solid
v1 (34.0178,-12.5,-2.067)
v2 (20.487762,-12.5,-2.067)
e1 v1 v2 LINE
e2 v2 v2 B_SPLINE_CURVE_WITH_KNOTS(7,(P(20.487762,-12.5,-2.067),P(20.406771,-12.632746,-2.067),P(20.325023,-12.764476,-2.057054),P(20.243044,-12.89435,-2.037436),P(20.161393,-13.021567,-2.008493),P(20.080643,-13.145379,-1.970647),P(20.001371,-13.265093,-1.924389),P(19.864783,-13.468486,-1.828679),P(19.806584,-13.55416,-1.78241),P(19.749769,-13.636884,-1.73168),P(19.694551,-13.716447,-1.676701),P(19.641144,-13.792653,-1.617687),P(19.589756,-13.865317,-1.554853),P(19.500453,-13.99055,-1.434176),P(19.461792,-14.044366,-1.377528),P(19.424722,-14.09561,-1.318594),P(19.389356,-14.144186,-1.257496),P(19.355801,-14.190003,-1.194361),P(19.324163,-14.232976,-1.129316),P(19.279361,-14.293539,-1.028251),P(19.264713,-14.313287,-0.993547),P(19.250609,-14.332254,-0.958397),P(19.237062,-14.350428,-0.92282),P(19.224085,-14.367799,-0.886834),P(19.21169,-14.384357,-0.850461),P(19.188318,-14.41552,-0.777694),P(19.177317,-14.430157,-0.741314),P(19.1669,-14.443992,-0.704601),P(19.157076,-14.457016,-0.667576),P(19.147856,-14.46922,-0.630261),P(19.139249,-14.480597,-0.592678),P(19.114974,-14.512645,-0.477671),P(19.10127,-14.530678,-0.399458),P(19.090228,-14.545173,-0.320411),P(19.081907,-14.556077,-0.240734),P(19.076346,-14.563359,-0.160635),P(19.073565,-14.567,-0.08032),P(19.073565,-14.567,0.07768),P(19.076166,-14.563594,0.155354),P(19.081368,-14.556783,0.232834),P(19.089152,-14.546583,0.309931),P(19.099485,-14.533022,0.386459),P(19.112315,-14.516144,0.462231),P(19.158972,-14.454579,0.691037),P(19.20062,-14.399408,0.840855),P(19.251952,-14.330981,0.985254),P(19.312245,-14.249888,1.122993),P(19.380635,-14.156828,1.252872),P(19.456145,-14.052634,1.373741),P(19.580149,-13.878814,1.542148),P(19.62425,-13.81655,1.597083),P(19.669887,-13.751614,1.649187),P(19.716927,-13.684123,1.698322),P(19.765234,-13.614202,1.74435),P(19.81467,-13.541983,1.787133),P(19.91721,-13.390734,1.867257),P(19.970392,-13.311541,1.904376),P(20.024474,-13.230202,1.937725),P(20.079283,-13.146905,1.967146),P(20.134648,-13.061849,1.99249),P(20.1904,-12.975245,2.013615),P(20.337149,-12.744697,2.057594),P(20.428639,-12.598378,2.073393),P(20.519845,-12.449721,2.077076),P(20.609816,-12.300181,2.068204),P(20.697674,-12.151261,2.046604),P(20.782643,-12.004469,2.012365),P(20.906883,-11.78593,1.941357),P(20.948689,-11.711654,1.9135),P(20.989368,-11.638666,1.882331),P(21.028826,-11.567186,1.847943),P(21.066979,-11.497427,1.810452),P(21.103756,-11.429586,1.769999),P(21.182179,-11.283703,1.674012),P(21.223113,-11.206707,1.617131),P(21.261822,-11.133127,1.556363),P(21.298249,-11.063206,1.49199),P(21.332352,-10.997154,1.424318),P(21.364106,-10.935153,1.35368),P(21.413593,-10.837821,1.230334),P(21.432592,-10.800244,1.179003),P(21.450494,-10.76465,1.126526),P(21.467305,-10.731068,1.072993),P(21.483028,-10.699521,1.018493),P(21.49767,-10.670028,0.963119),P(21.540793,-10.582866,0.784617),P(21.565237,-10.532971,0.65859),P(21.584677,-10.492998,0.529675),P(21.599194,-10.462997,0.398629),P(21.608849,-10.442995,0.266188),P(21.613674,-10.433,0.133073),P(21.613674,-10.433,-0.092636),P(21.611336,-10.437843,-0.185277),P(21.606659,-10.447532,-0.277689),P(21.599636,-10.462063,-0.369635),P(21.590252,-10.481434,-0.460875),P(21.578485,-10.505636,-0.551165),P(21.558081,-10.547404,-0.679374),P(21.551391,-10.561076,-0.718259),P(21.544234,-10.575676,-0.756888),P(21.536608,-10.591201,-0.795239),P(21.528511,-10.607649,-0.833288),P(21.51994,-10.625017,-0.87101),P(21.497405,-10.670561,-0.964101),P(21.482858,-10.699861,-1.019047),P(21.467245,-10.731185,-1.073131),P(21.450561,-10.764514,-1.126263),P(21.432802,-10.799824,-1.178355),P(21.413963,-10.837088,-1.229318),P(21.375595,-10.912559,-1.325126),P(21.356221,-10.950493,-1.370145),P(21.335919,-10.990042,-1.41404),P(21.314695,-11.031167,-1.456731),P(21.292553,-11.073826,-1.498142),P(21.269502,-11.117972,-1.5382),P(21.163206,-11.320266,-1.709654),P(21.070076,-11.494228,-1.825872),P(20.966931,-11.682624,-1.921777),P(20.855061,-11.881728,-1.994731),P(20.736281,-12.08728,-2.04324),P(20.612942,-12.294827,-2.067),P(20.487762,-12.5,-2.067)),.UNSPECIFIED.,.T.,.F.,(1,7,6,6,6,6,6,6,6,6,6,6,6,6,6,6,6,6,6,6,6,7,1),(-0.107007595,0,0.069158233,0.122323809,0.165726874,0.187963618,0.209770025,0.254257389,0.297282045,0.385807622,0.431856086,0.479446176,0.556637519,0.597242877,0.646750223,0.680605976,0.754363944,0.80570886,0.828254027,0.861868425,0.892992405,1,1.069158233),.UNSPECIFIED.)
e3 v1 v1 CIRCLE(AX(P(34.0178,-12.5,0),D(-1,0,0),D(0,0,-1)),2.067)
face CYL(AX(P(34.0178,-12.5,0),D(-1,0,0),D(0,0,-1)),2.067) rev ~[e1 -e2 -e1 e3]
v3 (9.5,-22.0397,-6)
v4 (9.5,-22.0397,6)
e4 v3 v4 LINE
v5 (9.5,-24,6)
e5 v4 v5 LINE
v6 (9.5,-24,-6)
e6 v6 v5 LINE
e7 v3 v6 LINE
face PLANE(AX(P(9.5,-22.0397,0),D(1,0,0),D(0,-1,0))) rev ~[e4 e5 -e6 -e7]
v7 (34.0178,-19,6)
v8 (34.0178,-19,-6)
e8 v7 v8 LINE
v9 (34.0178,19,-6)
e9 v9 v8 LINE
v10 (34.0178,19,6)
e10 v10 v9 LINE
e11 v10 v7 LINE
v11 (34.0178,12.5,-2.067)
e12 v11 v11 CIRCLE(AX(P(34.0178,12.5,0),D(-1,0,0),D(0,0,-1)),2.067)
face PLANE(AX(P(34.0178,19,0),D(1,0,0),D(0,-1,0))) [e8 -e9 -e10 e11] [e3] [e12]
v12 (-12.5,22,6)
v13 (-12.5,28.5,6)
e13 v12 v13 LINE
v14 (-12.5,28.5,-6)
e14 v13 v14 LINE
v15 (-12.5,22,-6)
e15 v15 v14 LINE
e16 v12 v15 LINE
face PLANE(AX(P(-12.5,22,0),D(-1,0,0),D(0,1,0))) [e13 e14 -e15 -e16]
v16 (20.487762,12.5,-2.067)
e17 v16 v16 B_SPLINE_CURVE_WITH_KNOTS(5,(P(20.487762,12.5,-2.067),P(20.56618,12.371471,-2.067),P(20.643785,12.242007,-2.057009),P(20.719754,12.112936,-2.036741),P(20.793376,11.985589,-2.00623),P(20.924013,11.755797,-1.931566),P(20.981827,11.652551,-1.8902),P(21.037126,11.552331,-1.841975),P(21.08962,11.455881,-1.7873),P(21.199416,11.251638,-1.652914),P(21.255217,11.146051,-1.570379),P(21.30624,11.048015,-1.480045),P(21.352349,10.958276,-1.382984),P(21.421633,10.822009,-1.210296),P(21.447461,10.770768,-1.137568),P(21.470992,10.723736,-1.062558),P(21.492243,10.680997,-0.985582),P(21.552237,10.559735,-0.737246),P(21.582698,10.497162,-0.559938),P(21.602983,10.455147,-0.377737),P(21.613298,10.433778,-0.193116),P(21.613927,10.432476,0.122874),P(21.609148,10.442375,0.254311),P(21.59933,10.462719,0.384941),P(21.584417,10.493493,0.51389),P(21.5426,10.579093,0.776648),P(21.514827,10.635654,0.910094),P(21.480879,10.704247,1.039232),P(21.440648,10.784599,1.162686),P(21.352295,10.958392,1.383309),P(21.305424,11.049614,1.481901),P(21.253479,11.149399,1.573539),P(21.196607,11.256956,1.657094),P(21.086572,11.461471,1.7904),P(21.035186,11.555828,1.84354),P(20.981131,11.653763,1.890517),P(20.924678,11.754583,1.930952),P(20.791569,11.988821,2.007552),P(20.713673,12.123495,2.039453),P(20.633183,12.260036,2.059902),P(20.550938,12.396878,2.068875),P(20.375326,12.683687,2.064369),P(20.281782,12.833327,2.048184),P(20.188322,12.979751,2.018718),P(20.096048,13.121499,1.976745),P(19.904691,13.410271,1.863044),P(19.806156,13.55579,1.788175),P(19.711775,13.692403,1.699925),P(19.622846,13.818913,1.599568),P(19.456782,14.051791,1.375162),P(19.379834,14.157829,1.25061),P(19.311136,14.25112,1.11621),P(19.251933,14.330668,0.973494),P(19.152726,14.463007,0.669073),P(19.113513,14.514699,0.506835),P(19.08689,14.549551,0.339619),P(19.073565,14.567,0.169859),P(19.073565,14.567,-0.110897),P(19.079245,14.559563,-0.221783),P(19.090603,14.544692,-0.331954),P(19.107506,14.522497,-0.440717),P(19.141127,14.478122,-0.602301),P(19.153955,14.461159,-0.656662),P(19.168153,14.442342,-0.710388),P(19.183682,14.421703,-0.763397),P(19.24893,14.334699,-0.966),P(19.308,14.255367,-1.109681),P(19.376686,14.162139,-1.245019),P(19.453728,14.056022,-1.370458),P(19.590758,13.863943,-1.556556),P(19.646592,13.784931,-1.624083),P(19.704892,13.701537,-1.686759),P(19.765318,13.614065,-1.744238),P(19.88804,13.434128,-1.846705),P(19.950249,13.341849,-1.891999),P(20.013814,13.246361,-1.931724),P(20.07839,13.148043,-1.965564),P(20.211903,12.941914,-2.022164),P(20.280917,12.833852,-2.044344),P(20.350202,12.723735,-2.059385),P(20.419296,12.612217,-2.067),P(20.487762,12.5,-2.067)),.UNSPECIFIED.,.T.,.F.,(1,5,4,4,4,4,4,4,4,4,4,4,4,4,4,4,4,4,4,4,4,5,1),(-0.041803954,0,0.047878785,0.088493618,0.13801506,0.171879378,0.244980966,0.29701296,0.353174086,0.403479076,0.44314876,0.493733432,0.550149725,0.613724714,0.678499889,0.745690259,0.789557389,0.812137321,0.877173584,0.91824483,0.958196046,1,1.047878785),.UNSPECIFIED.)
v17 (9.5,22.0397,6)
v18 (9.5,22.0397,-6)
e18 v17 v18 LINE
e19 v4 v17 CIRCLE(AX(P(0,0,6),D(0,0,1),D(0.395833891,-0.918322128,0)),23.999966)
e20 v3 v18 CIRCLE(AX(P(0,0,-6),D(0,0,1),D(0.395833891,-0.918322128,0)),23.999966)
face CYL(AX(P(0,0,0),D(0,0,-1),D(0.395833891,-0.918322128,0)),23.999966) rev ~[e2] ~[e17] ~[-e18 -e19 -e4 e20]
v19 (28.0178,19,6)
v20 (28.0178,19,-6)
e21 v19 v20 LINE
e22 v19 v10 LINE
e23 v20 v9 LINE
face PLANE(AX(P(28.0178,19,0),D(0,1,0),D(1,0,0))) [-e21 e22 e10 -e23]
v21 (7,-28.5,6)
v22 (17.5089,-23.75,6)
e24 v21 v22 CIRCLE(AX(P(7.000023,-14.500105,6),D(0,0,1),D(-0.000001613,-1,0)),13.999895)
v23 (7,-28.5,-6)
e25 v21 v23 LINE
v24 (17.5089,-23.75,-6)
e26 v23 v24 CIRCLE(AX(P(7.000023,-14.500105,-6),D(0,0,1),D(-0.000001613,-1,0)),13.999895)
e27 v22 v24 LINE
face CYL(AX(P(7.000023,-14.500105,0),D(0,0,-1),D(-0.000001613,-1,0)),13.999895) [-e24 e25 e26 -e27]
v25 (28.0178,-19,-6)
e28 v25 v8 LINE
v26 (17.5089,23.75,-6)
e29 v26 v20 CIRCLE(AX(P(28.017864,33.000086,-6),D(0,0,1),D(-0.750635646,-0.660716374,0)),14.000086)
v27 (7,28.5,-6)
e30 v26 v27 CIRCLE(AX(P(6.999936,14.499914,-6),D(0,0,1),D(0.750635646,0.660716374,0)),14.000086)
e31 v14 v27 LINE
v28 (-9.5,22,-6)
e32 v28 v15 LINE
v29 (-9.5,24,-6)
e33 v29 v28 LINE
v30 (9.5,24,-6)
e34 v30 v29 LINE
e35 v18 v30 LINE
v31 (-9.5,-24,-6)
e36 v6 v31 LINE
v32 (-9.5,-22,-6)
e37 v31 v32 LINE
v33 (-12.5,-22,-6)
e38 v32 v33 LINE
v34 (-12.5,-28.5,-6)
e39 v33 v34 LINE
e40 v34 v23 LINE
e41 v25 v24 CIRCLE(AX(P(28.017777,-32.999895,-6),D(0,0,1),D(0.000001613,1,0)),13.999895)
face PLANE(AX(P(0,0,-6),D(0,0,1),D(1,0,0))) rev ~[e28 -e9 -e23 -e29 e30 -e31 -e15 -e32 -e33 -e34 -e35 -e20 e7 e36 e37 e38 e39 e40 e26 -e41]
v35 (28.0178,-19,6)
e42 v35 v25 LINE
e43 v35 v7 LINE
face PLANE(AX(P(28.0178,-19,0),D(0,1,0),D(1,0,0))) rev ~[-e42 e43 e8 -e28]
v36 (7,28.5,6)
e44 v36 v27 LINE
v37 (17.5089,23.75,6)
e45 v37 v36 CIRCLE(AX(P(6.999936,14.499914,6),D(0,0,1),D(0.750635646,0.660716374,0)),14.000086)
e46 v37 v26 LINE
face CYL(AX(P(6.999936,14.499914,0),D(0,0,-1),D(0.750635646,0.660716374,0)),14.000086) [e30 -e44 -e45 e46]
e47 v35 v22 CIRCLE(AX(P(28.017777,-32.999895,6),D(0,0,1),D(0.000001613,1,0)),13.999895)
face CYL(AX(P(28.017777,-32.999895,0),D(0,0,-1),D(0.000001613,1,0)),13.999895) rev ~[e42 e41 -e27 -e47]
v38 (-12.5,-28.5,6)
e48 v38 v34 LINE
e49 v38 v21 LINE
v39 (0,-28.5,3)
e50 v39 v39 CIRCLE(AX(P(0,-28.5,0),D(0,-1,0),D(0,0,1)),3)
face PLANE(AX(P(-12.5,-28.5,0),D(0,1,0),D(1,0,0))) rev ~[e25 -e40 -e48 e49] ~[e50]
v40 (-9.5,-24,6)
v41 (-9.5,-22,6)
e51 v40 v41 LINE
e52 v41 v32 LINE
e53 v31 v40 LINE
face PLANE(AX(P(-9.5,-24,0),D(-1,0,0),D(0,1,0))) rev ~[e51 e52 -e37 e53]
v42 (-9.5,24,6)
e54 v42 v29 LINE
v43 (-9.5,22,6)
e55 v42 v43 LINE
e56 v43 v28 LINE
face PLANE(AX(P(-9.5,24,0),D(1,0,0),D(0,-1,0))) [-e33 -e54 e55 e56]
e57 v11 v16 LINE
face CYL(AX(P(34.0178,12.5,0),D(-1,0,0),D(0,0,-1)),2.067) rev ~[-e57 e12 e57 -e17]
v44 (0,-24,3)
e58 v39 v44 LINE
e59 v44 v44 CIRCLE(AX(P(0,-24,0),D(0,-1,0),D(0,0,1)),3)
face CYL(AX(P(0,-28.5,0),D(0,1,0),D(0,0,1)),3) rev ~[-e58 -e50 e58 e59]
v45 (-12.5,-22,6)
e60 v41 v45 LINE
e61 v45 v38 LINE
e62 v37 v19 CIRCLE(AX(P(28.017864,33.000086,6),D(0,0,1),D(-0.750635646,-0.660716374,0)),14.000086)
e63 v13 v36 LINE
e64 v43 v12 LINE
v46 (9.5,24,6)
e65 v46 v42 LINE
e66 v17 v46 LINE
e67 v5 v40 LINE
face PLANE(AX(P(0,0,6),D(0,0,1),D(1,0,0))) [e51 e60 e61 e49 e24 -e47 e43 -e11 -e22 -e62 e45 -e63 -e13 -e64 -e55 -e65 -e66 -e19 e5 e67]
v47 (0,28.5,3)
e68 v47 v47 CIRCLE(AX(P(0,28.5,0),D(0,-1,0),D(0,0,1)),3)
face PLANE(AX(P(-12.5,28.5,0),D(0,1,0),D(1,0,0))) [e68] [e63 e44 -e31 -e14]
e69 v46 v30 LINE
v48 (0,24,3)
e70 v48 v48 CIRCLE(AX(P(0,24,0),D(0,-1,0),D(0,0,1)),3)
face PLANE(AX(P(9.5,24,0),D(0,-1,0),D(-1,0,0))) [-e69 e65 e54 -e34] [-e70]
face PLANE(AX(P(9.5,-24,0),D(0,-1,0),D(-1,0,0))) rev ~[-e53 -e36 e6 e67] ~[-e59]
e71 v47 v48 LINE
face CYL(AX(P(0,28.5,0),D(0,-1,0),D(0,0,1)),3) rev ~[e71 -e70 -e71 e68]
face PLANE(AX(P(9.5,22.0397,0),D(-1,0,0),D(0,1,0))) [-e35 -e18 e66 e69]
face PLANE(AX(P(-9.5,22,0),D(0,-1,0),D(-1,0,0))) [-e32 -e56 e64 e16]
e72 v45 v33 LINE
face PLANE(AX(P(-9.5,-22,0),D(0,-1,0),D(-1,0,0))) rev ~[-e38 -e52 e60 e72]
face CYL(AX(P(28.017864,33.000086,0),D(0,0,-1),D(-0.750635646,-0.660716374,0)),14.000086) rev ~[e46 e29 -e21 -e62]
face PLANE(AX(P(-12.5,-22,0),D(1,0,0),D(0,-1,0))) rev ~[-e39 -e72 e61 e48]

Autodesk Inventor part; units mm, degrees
ref_plane "YZ Plane" through (0, 0, 0) normal (1, 0, 0) x (0, 1, 0)
ref_plane "XZ Plane" through (0, 0, 0) normal (0, 1, 0) x (-1, 0, 0)
ref_plane "XY Plane" through (0, 0, 0) normal (0, 0, 1) x (1, 0, 0)
sketch "Sketch1" plane through (0, 0, 0) normal (0, 0, 1) x (1, 0, 0)
  arc A0 (9.5, -22.0397) -> (9.5, 22.0397) centre (0, 0) ccw
  line L0 (-9.5, 22) -> (-9.5, -22) construction
  line L1 (9.5, 22.0397) -> (9.5, -22.0397) construction
  line L2 (9.5, 22.0397) -> (9.5, 24)
  line L3 (9.5, 24) -> (-9.5, 24)
  line L4 (-9.5, 24) -> (-9.5, 22)
  line L5 (-9.5, 22) -> (-12.5, 22)
  line L6 (-12.5, 22) -> (-12.5, 28.5)
  arc A1 (17.5089, 23.75) -> (28.0178, 19) centre (28.0178, 33) ccw
  line L7 (28.0178, 19) -> (34.0178, 19)
  line L8 (34.0178, 19) -> (34.0178, -19)
  line L9 (9.5, -22.0397) -> (9.5, -24)
  line L10 (9.5, -24) -> (-9.5, -24)
  line L11 (-9.5, -24) -> (-9.5, -22)
  line L12 (-12.5, -22) -> (-12.5, -28.5)
  line L13 (-9.5, -22) -> (-12.5, -22)
  arc A2 (28.0178, -19) -> (17.5089, -23.75) centre (28.0178, -33) ccw
  line L14 (28.0178, -19) -> (34.0178, -19)
  line L15 (-12.5, 28.5) -> (7, 28.5)
  arc A3 (17.5089, 23.75) -> (7, 28.5) centre (7, 14.5) ccw
  line L16 (-12.5, -28.5) -> (7, -28.5)
  arc A4 (7, -28.5) -> (17.5089, -23.75) centre (7, -14.5) ccw
  point P0 (9.5, 0)
  point P1 (0, -24)
  point P2 (0, 24)
  point P3 (-2.75, 28.5)
  point P4 (-2.75, -28.5)
  dimension "d0" = 48
  dimension "d1" = 9.5
  dimension "d2" = 9.5
  dimension "d3" = 38
  dimension "d4" = 19
  dimension "d7" = 14
  dimension "d8" = 14
  dimension "d9" = 14
  dimension "d10" = 7
  dimension "d11" = 14
  dimension "d12" = 7
  dimension "d13" = 12.5
  dimension "d14" = 12.5
  dimension "d15" = 4.5
  dimension "d16" = 4.5
  dimension "d17" = 2
  dimension "d18" = 2
  dimension "d19" = 24
  dimension "d20" = 24
  dimension "d21" = 6
extrude "Extrusion1" add sketch "Sketch1" along normal mid plane 12
sketch "Sketch2" plane through (34.0178, -19, 6) normal (1, 0, 0) x (0, 0, -1)
  point P0 (6, 19)
  point P1 (6, 31.5)
  point P2 (6, 6.5)
  dimension "d31" = 25
  dimension "d32" = 12.5
hole "Hole1" at (34.0178, 12.5, 0) at (34.0178, -12.5, 0) direction (-1, 0, 0) diameter 4.134 end through all thread size "M5x0.8" class "6H" standard "ISO Metric profile"
sketch "Sketch3" plane through (-12.5, 28.5, 6) normal (0, 1, 0) x (1, 0, 0)
  line L0 (0, 12) -> (0, 0) projected
  point P0 (12.5, 6)
  point P1 (12.5, 6)
  point P2 (0, 6)
  point P3 (0, 6)
  dimension "d40" = 12.5
hole "Hole2" at (0, 28.5, 0) direction (0, -1, 0) diameter 6 depth 4.5
mirror "Mirror1" about plane through (0, 0, 0) normal (0, 1, 0) of "Hole2"
equation "\"d4\" = 0.5 * d3"
equation "\"d7\" = d5"
equation "\"d8\" = d5"
equation "\"d12\" = d10"
equation "\"d14\" = d13"
equation "\"d16\" = d15"
equation "\"d20\" = d19"
equation "\"d32\" = 0.5 * d31"
equation "\"d5\" = 14"
properties part number "102 new"
